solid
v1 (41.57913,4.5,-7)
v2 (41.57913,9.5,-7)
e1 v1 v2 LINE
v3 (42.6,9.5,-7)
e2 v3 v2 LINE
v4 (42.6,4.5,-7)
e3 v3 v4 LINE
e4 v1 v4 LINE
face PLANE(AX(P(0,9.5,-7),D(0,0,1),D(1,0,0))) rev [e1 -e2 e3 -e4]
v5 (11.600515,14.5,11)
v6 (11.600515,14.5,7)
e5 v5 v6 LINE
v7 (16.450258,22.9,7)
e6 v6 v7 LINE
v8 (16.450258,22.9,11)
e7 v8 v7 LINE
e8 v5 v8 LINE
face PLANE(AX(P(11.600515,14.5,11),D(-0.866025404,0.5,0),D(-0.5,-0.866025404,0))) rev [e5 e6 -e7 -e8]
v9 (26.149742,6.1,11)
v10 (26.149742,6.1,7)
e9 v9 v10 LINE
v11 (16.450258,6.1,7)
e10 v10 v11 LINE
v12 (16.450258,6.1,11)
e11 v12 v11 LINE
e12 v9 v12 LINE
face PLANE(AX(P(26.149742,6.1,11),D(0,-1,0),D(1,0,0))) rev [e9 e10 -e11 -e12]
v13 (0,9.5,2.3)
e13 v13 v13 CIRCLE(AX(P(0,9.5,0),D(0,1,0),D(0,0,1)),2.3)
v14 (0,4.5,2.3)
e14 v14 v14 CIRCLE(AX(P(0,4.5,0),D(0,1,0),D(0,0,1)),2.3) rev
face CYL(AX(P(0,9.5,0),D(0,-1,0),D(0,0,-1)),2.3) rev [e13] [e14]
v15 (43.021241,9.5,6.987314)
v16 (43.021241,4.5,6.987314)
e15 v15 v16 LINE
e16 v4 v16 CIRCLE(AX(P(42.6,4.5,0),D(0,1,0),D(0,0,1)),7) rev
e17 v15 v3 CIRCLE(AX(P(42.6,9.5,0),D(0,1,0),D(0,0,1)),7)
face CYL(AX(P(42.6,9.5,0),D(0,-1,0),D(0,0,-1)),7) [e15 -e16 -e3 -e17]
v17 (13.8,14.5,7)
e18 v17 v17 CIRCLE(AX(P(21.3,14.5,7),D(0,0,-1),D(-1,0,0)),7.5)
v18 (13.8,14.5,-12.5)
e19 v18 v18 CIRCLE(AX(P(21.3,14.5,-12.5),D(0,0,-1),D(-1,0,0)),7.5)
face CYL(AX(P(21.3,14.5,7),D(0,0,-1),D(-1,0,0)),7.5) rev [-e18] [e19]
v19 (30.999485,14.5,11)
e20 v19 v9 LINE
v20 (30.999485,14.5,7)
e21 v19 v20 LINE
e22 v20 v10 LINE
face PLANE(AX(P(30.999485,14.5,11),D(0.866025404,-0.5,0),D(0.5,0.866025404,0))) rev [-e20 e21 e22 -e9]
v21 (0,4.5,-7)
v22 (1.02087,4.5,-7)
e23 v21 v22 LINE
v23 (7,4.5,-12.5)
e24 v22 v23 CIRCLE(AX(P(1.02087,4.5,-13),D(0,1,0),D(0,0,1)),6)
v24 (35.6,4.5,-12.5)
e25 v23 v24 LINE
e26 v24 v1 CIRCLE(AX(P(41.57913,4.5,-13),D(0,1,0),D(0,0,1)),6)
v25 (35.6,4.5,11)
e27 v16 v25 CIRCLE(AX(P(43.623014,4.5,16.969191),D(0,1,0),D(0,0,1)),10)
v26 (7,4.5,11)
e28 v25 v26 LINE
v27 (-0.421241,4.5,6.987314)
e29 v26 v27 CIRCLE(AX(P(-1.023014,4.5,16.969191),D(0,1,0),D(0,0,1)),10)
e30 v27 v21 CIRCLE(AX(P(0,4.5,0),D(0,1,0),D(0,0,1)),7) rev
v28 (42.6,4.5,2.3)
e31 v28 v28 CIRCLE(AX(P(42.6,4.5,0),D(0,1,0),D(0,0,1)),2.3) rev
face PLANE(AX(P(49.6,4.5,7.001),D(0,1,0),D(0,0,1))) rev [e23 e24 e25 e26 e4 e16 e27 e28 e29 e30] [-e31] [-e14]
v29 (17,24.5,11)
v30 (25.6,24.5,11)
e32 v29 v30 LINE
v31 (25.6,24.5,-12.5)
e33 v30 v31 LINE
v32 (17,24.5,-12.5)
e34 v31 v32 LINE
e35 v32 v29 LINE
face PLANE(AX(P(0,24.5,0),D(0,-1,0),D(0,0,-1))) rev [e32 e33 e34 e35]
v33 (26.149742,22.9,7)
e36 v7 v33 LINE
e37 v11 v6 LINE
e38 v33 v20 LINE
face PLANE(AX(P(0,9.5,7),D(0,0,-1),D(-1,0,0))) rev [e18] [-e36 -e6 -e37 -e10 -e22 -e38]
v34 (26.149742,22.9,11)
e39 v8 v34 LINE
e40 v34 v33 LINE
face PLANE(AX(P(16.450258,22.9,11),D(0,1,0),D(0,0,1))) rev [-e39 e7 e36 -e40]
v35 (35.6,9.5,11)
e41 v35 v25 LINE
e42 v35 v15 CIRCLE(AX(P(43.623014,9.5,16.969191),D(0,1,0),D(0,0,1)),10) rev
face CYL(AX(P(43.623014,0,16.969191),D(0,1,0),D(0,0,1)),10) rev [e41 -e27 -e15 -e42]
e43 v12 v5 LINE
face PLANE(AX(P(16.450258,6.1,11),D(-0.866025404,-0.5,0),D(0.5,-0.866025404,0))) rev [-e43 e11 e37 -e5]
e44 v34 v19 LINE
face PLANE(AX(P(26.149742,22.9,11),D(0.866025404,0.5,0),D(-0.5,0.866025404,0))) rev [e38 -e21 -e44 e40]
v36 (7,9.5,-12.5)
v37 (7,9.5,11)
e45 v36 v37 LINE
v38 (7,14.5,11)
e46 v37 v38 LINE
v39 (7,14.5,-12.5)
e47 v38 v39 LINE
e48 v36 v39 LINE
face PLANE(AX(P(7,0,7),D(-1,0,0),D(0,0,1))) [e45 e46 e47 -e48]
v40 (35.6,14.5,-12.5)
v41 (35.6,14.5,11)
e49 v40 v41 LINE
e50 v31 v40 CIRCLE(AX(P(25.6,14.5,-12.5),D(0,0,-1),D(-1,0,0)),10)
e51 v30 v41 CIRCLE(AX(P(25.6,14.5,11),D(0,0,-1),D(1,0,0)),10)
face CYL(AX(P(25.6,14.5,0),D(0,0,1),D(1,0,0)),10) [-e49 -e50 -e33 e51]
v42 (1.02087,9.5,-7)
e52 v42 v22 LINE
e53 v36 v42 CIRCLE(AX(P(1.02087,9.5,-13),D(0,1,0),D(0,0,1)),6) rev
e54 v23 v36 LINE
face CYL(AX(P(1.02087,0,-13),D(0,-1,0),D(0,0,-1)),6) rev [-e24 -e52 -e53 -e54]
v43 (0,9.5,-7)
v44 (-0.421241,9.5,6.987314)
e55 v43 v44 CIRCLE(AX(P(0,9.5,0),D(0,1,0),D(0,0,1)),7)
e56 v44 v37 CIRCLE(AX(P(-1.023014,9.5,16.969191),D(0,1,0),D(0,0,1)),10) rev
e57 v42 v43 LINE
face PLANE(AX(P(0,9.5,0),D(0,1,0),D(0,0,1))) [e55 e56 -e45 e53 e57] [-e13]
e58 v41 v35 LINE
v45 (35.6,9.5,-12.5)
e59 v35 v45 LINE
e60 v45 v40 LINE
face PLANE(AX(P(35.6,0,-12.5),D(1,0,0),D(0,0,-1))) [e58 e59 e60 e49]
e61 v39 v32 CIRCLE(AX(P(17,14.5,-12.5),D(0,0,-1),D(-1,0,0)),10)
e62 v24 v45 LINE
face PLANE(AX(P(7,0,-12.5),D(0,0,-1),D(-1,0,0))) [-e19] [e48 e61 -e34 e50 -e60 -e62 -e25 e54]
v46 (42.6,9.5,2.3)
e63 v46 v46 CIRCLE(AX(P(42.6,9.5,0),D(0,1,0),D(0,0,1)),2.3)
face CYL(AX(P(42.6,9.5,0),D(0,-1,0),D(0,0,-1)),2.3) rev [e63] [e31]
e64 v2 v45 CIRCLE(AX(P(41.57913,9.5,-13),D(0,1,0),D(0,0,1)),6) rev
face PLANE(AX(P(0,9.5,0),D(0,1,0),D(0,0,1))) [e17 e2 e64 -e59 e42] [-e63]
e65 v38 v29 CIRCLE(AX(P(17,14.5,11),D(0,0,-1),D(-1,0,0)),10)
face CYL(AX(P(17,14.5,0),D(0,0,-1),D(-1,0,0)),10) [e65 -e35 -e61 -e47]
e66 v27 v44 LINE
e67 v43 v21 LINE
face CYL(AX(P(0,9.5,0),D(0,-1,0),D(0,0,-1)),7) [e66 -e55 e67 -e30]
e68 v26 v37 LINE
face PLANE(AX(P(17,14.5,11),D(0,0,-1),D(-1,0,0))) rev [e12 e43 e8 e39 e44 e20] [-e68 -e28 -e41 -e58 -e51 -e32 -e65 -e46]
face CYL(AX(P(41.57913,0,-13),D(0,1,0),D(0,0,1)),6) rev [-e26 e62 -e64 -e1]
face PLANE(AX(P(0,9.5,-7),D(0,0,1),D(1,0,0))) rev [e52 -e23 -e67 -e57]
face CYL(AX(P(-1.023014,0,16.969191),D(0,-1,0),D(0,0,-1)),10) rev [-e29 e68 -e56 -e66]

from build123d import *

# Parameters (mm, degrees)
SKETCH1_R                = 2.3
BOSS_EXTRUDE1_DEPTH      = 9.5
BOSS_EXTRUDE2_DEPTH      = 15
BOSS_EXTRUDE2_DEPTH_BACK = 9.5
SKETCH2_W                = 28.6
SKETCH2_H                = 19.5
SKETCH3_R                = 7.5
CUT_EXTRUDE1_DEPTH       = 59.657139378
FILLET1_R                = 10
FILLET2_R                = 6
CUT_EXTRUDE2_REACH       = 60.657
SKETCH5_W                = 56.6
SKETCH5_H                = 4.5
BOSS_EXTRUDE3_DEPTH      = 4
FILLET3_R                = 10


with BuildPart() as part:
    # Sketch1 → Boss-Extrude1 (new body)
    with BuildSketch(Plane(origin=(0, 0, 0), x_dir=(1, 0, 0), z_dir=(0, 1, 0))):
        with BuildLine():
            Line((0, 7), (42.6, 7))
            ThreePointArc((42.6, 7), (49.6, 0), (42.6, -7))
            Line((42.6, -7), (0, -7))
            ThreePointArc((0, -7), (-7, 0), (0, 7))
        make_face()
        with Locations(Location((0, 0, 0), (0, 0, 270))):
            Circle(SKETCH1_R, mode=Mode.SUBTRACT)
        with Locations(Location((42.6, 0, 0), (0, 0, 270))):
            Circle(SKETCH1_R, mode=Mode.SUBTRACT)
    extrude(amount=BOSS_EXTRUDE1_DEPTH)

    # Sketch2 → Boss-Extrude2 (add, two sides: drawn at the far end of the back side and taken through both)
    with BuildSketch(Plane(origin=(0, 9.5, 0), x_dir=(1, 0, 0), z_dir=(0, 1, 0)).offset(-BOSS_EXTRUDE2_DEPTH_BACK)):
        with Locations((21.3, 2.75)):
            Rectangle(SKETCH2_W, SKETCH2_H)
    extrude(amount=BOSS_EXTRUDE2_DEPTH + BOSS_EXTRUDE2_DEPTH_BACK)

    # Sketch3 → Cut-Extrude1 (cut, through all)
    with BuildSketch(Plane(origin=(0, 0, -12.5), x_dir=(-1, 0, 0), z_dir=(0, 0, -1))):
        with Locations((-21.3, 14.5)):
            Circle(SKETCH3_R)
    extrude(amount=-CUT_EXTRUDE1_DEPTH, mode=Mode.SUBTRACT)

    # Fillet1
    fillet1_edges = [part.edges().sort_by_distance(p)[0] for p in [
        (7, 24.5, -2.75),
        (35.6, 24.5, -2.75),
    ]]
    fillet(fillet1_edges, radius=FILLET1_R)

    # Fillet2
    # the kernel refuses this fillet: 6 mm, written as the material it adds along each edge
    with BuildSketch(Plane(origin=(7, 0, -7), x_dir=(0, 0, -1), z_dir=(0, 1, 0)), Plane(origin=(35.6, 9.5, -7), x_dir=(0, 0, -1), z_dir=(0, -1, 0))) as fillet2_piece_1:
        with BuildLine():
            CenterArc((6, 5.979130372), FILLET2_R, 180, 85.219808153)
            Line((0, 5.979130372), (-0.12, 5.979130372))
            Line((-0.12, 5.979130372), (-0.12, 0))
            Line((-0.12, 0), (0, -0.12))
            ThreePointArc((0, -0.12), (2.75, -0.12), (5.49, -0.119582607))
            Line((5.49, -0.119582607), (5.5, 0))
        make_face()
    extrude(amount=9.5)

    # Sketch5 → Cut-Extrude2 (cut, up to next)
    with BuildSketch(Plane(origin=(0, 0, -12.5), x_dir=(-1, 0, 0), z_dir=(0, 0, -1)), mode=Mode.PRIVATE) as cut_extrude2_sk1:
        with Locations((-21.3, 2.25)):
            Rectangle(SKETCH5_W, SKETCH5_H)
    cut_extrude2_tool1 = extrude(cut_extrude2_sk1.sketch, amount=-CUT_EXTRUDE2_REACH, mode=Mode.PRIVATE) & part.part
    add(cut_extrude2_tool1.solids().sort_by_distance((21.3, 2.25, -12.5))[0], mode=Mode.SUBTRACT)

    # Sketch10 → Boss-Extrude3 (add)
    with BuildSketch(Plane(origin=(0, 0, 7), x_dir=(-1, 0, 0), z_dir=(0, 0, -1))):
        with BuildLine():
            Line((-35.6, 4.5), (-35.6, 14.5))
            ThreePointArc((-35.6, 14.5), (-32.671067812, 21.571067812), (-25.6, 24.5))
            Line((-25.6, 24.5), (-17, 24.5))
            ThreePointArc((-17, 24.5), (-9.928932188, 21.571067812), (-7, 14.5))
            Line((-7, 14.5), (-7, 4.5))
            Line((-7, 4.5), (-35.6, 4.5))
        make_face()
        Polygon((-16.450257739, 22.9), (-26.149742261, 22.9), (-30.999484522, 14.5), (-26.149742261, 6.1), (-16.450257739, 6.1), (-11.600515478, 14.5), align=None, mode=Mode.SUBTRACT)
    extrude(amount=-BOSS_EXTRUDE3_DEPTH)

    # Fillet3
    # the kernel refuses this fillet: 10 mm, written as the material it adds along each edge
    with BuildSketch(Plane(origin=(7, 9.5, 7), x_dir=(-0.9999985389310836, 0, -0.0017094255462351089), z_dir=(0, -1, 0))) as fillet3_piece_1:
        with BuildLine():
            CenterArc((8.005961044, -9.982891134), FILLET3_R, 93.352047646, 49.900448128)
            Line((-0.006837702, -3.999994156), (-0.808117577, -3.401704458))
            ThreePointArc((-0.808117577, -3.401704458), (-1.00341739, -1.998287652), (-0.999998539, 0.001709426))
            Line((-0.999998539, 0.001709426), (0.001709426, 0.999998539))
            ThreePointArc((0.001709426, 0.999998539), (7.001699198, 0.98803256), (7.362781149, 0.998289113))
            Line((7.362781149, 0.998289113), (7.421252048, 0))
        make_face()
    extrude(amount=5)
    with BuildSketch(Plane(origin=(35.6, 4.5, 7), x_dir=(0, 0, 1), z_dir=(0, 1, 0))) as fillet3_piece_2:
        with BuildLine():
            CenterArc((9.969190954, 8.023014356), FILLET3_R, 183.449990563, 49.900448128)
            Line((-0.012686078, 7.421241205), (-1.010873781, 7.36106389))
            ThreePointArc((-1.010873781, 7.36106389), (-1, 7), (-1, 0))
            Line((-1, 0), (0, -1))
            ThreePointArc((0, -1), (2, -1), (3.403080905, -0.802301436))
            Line((3.403080905, -0.802301436), (4, 0))
        make_face()
    extrude(amount=5)


solid = part.part
